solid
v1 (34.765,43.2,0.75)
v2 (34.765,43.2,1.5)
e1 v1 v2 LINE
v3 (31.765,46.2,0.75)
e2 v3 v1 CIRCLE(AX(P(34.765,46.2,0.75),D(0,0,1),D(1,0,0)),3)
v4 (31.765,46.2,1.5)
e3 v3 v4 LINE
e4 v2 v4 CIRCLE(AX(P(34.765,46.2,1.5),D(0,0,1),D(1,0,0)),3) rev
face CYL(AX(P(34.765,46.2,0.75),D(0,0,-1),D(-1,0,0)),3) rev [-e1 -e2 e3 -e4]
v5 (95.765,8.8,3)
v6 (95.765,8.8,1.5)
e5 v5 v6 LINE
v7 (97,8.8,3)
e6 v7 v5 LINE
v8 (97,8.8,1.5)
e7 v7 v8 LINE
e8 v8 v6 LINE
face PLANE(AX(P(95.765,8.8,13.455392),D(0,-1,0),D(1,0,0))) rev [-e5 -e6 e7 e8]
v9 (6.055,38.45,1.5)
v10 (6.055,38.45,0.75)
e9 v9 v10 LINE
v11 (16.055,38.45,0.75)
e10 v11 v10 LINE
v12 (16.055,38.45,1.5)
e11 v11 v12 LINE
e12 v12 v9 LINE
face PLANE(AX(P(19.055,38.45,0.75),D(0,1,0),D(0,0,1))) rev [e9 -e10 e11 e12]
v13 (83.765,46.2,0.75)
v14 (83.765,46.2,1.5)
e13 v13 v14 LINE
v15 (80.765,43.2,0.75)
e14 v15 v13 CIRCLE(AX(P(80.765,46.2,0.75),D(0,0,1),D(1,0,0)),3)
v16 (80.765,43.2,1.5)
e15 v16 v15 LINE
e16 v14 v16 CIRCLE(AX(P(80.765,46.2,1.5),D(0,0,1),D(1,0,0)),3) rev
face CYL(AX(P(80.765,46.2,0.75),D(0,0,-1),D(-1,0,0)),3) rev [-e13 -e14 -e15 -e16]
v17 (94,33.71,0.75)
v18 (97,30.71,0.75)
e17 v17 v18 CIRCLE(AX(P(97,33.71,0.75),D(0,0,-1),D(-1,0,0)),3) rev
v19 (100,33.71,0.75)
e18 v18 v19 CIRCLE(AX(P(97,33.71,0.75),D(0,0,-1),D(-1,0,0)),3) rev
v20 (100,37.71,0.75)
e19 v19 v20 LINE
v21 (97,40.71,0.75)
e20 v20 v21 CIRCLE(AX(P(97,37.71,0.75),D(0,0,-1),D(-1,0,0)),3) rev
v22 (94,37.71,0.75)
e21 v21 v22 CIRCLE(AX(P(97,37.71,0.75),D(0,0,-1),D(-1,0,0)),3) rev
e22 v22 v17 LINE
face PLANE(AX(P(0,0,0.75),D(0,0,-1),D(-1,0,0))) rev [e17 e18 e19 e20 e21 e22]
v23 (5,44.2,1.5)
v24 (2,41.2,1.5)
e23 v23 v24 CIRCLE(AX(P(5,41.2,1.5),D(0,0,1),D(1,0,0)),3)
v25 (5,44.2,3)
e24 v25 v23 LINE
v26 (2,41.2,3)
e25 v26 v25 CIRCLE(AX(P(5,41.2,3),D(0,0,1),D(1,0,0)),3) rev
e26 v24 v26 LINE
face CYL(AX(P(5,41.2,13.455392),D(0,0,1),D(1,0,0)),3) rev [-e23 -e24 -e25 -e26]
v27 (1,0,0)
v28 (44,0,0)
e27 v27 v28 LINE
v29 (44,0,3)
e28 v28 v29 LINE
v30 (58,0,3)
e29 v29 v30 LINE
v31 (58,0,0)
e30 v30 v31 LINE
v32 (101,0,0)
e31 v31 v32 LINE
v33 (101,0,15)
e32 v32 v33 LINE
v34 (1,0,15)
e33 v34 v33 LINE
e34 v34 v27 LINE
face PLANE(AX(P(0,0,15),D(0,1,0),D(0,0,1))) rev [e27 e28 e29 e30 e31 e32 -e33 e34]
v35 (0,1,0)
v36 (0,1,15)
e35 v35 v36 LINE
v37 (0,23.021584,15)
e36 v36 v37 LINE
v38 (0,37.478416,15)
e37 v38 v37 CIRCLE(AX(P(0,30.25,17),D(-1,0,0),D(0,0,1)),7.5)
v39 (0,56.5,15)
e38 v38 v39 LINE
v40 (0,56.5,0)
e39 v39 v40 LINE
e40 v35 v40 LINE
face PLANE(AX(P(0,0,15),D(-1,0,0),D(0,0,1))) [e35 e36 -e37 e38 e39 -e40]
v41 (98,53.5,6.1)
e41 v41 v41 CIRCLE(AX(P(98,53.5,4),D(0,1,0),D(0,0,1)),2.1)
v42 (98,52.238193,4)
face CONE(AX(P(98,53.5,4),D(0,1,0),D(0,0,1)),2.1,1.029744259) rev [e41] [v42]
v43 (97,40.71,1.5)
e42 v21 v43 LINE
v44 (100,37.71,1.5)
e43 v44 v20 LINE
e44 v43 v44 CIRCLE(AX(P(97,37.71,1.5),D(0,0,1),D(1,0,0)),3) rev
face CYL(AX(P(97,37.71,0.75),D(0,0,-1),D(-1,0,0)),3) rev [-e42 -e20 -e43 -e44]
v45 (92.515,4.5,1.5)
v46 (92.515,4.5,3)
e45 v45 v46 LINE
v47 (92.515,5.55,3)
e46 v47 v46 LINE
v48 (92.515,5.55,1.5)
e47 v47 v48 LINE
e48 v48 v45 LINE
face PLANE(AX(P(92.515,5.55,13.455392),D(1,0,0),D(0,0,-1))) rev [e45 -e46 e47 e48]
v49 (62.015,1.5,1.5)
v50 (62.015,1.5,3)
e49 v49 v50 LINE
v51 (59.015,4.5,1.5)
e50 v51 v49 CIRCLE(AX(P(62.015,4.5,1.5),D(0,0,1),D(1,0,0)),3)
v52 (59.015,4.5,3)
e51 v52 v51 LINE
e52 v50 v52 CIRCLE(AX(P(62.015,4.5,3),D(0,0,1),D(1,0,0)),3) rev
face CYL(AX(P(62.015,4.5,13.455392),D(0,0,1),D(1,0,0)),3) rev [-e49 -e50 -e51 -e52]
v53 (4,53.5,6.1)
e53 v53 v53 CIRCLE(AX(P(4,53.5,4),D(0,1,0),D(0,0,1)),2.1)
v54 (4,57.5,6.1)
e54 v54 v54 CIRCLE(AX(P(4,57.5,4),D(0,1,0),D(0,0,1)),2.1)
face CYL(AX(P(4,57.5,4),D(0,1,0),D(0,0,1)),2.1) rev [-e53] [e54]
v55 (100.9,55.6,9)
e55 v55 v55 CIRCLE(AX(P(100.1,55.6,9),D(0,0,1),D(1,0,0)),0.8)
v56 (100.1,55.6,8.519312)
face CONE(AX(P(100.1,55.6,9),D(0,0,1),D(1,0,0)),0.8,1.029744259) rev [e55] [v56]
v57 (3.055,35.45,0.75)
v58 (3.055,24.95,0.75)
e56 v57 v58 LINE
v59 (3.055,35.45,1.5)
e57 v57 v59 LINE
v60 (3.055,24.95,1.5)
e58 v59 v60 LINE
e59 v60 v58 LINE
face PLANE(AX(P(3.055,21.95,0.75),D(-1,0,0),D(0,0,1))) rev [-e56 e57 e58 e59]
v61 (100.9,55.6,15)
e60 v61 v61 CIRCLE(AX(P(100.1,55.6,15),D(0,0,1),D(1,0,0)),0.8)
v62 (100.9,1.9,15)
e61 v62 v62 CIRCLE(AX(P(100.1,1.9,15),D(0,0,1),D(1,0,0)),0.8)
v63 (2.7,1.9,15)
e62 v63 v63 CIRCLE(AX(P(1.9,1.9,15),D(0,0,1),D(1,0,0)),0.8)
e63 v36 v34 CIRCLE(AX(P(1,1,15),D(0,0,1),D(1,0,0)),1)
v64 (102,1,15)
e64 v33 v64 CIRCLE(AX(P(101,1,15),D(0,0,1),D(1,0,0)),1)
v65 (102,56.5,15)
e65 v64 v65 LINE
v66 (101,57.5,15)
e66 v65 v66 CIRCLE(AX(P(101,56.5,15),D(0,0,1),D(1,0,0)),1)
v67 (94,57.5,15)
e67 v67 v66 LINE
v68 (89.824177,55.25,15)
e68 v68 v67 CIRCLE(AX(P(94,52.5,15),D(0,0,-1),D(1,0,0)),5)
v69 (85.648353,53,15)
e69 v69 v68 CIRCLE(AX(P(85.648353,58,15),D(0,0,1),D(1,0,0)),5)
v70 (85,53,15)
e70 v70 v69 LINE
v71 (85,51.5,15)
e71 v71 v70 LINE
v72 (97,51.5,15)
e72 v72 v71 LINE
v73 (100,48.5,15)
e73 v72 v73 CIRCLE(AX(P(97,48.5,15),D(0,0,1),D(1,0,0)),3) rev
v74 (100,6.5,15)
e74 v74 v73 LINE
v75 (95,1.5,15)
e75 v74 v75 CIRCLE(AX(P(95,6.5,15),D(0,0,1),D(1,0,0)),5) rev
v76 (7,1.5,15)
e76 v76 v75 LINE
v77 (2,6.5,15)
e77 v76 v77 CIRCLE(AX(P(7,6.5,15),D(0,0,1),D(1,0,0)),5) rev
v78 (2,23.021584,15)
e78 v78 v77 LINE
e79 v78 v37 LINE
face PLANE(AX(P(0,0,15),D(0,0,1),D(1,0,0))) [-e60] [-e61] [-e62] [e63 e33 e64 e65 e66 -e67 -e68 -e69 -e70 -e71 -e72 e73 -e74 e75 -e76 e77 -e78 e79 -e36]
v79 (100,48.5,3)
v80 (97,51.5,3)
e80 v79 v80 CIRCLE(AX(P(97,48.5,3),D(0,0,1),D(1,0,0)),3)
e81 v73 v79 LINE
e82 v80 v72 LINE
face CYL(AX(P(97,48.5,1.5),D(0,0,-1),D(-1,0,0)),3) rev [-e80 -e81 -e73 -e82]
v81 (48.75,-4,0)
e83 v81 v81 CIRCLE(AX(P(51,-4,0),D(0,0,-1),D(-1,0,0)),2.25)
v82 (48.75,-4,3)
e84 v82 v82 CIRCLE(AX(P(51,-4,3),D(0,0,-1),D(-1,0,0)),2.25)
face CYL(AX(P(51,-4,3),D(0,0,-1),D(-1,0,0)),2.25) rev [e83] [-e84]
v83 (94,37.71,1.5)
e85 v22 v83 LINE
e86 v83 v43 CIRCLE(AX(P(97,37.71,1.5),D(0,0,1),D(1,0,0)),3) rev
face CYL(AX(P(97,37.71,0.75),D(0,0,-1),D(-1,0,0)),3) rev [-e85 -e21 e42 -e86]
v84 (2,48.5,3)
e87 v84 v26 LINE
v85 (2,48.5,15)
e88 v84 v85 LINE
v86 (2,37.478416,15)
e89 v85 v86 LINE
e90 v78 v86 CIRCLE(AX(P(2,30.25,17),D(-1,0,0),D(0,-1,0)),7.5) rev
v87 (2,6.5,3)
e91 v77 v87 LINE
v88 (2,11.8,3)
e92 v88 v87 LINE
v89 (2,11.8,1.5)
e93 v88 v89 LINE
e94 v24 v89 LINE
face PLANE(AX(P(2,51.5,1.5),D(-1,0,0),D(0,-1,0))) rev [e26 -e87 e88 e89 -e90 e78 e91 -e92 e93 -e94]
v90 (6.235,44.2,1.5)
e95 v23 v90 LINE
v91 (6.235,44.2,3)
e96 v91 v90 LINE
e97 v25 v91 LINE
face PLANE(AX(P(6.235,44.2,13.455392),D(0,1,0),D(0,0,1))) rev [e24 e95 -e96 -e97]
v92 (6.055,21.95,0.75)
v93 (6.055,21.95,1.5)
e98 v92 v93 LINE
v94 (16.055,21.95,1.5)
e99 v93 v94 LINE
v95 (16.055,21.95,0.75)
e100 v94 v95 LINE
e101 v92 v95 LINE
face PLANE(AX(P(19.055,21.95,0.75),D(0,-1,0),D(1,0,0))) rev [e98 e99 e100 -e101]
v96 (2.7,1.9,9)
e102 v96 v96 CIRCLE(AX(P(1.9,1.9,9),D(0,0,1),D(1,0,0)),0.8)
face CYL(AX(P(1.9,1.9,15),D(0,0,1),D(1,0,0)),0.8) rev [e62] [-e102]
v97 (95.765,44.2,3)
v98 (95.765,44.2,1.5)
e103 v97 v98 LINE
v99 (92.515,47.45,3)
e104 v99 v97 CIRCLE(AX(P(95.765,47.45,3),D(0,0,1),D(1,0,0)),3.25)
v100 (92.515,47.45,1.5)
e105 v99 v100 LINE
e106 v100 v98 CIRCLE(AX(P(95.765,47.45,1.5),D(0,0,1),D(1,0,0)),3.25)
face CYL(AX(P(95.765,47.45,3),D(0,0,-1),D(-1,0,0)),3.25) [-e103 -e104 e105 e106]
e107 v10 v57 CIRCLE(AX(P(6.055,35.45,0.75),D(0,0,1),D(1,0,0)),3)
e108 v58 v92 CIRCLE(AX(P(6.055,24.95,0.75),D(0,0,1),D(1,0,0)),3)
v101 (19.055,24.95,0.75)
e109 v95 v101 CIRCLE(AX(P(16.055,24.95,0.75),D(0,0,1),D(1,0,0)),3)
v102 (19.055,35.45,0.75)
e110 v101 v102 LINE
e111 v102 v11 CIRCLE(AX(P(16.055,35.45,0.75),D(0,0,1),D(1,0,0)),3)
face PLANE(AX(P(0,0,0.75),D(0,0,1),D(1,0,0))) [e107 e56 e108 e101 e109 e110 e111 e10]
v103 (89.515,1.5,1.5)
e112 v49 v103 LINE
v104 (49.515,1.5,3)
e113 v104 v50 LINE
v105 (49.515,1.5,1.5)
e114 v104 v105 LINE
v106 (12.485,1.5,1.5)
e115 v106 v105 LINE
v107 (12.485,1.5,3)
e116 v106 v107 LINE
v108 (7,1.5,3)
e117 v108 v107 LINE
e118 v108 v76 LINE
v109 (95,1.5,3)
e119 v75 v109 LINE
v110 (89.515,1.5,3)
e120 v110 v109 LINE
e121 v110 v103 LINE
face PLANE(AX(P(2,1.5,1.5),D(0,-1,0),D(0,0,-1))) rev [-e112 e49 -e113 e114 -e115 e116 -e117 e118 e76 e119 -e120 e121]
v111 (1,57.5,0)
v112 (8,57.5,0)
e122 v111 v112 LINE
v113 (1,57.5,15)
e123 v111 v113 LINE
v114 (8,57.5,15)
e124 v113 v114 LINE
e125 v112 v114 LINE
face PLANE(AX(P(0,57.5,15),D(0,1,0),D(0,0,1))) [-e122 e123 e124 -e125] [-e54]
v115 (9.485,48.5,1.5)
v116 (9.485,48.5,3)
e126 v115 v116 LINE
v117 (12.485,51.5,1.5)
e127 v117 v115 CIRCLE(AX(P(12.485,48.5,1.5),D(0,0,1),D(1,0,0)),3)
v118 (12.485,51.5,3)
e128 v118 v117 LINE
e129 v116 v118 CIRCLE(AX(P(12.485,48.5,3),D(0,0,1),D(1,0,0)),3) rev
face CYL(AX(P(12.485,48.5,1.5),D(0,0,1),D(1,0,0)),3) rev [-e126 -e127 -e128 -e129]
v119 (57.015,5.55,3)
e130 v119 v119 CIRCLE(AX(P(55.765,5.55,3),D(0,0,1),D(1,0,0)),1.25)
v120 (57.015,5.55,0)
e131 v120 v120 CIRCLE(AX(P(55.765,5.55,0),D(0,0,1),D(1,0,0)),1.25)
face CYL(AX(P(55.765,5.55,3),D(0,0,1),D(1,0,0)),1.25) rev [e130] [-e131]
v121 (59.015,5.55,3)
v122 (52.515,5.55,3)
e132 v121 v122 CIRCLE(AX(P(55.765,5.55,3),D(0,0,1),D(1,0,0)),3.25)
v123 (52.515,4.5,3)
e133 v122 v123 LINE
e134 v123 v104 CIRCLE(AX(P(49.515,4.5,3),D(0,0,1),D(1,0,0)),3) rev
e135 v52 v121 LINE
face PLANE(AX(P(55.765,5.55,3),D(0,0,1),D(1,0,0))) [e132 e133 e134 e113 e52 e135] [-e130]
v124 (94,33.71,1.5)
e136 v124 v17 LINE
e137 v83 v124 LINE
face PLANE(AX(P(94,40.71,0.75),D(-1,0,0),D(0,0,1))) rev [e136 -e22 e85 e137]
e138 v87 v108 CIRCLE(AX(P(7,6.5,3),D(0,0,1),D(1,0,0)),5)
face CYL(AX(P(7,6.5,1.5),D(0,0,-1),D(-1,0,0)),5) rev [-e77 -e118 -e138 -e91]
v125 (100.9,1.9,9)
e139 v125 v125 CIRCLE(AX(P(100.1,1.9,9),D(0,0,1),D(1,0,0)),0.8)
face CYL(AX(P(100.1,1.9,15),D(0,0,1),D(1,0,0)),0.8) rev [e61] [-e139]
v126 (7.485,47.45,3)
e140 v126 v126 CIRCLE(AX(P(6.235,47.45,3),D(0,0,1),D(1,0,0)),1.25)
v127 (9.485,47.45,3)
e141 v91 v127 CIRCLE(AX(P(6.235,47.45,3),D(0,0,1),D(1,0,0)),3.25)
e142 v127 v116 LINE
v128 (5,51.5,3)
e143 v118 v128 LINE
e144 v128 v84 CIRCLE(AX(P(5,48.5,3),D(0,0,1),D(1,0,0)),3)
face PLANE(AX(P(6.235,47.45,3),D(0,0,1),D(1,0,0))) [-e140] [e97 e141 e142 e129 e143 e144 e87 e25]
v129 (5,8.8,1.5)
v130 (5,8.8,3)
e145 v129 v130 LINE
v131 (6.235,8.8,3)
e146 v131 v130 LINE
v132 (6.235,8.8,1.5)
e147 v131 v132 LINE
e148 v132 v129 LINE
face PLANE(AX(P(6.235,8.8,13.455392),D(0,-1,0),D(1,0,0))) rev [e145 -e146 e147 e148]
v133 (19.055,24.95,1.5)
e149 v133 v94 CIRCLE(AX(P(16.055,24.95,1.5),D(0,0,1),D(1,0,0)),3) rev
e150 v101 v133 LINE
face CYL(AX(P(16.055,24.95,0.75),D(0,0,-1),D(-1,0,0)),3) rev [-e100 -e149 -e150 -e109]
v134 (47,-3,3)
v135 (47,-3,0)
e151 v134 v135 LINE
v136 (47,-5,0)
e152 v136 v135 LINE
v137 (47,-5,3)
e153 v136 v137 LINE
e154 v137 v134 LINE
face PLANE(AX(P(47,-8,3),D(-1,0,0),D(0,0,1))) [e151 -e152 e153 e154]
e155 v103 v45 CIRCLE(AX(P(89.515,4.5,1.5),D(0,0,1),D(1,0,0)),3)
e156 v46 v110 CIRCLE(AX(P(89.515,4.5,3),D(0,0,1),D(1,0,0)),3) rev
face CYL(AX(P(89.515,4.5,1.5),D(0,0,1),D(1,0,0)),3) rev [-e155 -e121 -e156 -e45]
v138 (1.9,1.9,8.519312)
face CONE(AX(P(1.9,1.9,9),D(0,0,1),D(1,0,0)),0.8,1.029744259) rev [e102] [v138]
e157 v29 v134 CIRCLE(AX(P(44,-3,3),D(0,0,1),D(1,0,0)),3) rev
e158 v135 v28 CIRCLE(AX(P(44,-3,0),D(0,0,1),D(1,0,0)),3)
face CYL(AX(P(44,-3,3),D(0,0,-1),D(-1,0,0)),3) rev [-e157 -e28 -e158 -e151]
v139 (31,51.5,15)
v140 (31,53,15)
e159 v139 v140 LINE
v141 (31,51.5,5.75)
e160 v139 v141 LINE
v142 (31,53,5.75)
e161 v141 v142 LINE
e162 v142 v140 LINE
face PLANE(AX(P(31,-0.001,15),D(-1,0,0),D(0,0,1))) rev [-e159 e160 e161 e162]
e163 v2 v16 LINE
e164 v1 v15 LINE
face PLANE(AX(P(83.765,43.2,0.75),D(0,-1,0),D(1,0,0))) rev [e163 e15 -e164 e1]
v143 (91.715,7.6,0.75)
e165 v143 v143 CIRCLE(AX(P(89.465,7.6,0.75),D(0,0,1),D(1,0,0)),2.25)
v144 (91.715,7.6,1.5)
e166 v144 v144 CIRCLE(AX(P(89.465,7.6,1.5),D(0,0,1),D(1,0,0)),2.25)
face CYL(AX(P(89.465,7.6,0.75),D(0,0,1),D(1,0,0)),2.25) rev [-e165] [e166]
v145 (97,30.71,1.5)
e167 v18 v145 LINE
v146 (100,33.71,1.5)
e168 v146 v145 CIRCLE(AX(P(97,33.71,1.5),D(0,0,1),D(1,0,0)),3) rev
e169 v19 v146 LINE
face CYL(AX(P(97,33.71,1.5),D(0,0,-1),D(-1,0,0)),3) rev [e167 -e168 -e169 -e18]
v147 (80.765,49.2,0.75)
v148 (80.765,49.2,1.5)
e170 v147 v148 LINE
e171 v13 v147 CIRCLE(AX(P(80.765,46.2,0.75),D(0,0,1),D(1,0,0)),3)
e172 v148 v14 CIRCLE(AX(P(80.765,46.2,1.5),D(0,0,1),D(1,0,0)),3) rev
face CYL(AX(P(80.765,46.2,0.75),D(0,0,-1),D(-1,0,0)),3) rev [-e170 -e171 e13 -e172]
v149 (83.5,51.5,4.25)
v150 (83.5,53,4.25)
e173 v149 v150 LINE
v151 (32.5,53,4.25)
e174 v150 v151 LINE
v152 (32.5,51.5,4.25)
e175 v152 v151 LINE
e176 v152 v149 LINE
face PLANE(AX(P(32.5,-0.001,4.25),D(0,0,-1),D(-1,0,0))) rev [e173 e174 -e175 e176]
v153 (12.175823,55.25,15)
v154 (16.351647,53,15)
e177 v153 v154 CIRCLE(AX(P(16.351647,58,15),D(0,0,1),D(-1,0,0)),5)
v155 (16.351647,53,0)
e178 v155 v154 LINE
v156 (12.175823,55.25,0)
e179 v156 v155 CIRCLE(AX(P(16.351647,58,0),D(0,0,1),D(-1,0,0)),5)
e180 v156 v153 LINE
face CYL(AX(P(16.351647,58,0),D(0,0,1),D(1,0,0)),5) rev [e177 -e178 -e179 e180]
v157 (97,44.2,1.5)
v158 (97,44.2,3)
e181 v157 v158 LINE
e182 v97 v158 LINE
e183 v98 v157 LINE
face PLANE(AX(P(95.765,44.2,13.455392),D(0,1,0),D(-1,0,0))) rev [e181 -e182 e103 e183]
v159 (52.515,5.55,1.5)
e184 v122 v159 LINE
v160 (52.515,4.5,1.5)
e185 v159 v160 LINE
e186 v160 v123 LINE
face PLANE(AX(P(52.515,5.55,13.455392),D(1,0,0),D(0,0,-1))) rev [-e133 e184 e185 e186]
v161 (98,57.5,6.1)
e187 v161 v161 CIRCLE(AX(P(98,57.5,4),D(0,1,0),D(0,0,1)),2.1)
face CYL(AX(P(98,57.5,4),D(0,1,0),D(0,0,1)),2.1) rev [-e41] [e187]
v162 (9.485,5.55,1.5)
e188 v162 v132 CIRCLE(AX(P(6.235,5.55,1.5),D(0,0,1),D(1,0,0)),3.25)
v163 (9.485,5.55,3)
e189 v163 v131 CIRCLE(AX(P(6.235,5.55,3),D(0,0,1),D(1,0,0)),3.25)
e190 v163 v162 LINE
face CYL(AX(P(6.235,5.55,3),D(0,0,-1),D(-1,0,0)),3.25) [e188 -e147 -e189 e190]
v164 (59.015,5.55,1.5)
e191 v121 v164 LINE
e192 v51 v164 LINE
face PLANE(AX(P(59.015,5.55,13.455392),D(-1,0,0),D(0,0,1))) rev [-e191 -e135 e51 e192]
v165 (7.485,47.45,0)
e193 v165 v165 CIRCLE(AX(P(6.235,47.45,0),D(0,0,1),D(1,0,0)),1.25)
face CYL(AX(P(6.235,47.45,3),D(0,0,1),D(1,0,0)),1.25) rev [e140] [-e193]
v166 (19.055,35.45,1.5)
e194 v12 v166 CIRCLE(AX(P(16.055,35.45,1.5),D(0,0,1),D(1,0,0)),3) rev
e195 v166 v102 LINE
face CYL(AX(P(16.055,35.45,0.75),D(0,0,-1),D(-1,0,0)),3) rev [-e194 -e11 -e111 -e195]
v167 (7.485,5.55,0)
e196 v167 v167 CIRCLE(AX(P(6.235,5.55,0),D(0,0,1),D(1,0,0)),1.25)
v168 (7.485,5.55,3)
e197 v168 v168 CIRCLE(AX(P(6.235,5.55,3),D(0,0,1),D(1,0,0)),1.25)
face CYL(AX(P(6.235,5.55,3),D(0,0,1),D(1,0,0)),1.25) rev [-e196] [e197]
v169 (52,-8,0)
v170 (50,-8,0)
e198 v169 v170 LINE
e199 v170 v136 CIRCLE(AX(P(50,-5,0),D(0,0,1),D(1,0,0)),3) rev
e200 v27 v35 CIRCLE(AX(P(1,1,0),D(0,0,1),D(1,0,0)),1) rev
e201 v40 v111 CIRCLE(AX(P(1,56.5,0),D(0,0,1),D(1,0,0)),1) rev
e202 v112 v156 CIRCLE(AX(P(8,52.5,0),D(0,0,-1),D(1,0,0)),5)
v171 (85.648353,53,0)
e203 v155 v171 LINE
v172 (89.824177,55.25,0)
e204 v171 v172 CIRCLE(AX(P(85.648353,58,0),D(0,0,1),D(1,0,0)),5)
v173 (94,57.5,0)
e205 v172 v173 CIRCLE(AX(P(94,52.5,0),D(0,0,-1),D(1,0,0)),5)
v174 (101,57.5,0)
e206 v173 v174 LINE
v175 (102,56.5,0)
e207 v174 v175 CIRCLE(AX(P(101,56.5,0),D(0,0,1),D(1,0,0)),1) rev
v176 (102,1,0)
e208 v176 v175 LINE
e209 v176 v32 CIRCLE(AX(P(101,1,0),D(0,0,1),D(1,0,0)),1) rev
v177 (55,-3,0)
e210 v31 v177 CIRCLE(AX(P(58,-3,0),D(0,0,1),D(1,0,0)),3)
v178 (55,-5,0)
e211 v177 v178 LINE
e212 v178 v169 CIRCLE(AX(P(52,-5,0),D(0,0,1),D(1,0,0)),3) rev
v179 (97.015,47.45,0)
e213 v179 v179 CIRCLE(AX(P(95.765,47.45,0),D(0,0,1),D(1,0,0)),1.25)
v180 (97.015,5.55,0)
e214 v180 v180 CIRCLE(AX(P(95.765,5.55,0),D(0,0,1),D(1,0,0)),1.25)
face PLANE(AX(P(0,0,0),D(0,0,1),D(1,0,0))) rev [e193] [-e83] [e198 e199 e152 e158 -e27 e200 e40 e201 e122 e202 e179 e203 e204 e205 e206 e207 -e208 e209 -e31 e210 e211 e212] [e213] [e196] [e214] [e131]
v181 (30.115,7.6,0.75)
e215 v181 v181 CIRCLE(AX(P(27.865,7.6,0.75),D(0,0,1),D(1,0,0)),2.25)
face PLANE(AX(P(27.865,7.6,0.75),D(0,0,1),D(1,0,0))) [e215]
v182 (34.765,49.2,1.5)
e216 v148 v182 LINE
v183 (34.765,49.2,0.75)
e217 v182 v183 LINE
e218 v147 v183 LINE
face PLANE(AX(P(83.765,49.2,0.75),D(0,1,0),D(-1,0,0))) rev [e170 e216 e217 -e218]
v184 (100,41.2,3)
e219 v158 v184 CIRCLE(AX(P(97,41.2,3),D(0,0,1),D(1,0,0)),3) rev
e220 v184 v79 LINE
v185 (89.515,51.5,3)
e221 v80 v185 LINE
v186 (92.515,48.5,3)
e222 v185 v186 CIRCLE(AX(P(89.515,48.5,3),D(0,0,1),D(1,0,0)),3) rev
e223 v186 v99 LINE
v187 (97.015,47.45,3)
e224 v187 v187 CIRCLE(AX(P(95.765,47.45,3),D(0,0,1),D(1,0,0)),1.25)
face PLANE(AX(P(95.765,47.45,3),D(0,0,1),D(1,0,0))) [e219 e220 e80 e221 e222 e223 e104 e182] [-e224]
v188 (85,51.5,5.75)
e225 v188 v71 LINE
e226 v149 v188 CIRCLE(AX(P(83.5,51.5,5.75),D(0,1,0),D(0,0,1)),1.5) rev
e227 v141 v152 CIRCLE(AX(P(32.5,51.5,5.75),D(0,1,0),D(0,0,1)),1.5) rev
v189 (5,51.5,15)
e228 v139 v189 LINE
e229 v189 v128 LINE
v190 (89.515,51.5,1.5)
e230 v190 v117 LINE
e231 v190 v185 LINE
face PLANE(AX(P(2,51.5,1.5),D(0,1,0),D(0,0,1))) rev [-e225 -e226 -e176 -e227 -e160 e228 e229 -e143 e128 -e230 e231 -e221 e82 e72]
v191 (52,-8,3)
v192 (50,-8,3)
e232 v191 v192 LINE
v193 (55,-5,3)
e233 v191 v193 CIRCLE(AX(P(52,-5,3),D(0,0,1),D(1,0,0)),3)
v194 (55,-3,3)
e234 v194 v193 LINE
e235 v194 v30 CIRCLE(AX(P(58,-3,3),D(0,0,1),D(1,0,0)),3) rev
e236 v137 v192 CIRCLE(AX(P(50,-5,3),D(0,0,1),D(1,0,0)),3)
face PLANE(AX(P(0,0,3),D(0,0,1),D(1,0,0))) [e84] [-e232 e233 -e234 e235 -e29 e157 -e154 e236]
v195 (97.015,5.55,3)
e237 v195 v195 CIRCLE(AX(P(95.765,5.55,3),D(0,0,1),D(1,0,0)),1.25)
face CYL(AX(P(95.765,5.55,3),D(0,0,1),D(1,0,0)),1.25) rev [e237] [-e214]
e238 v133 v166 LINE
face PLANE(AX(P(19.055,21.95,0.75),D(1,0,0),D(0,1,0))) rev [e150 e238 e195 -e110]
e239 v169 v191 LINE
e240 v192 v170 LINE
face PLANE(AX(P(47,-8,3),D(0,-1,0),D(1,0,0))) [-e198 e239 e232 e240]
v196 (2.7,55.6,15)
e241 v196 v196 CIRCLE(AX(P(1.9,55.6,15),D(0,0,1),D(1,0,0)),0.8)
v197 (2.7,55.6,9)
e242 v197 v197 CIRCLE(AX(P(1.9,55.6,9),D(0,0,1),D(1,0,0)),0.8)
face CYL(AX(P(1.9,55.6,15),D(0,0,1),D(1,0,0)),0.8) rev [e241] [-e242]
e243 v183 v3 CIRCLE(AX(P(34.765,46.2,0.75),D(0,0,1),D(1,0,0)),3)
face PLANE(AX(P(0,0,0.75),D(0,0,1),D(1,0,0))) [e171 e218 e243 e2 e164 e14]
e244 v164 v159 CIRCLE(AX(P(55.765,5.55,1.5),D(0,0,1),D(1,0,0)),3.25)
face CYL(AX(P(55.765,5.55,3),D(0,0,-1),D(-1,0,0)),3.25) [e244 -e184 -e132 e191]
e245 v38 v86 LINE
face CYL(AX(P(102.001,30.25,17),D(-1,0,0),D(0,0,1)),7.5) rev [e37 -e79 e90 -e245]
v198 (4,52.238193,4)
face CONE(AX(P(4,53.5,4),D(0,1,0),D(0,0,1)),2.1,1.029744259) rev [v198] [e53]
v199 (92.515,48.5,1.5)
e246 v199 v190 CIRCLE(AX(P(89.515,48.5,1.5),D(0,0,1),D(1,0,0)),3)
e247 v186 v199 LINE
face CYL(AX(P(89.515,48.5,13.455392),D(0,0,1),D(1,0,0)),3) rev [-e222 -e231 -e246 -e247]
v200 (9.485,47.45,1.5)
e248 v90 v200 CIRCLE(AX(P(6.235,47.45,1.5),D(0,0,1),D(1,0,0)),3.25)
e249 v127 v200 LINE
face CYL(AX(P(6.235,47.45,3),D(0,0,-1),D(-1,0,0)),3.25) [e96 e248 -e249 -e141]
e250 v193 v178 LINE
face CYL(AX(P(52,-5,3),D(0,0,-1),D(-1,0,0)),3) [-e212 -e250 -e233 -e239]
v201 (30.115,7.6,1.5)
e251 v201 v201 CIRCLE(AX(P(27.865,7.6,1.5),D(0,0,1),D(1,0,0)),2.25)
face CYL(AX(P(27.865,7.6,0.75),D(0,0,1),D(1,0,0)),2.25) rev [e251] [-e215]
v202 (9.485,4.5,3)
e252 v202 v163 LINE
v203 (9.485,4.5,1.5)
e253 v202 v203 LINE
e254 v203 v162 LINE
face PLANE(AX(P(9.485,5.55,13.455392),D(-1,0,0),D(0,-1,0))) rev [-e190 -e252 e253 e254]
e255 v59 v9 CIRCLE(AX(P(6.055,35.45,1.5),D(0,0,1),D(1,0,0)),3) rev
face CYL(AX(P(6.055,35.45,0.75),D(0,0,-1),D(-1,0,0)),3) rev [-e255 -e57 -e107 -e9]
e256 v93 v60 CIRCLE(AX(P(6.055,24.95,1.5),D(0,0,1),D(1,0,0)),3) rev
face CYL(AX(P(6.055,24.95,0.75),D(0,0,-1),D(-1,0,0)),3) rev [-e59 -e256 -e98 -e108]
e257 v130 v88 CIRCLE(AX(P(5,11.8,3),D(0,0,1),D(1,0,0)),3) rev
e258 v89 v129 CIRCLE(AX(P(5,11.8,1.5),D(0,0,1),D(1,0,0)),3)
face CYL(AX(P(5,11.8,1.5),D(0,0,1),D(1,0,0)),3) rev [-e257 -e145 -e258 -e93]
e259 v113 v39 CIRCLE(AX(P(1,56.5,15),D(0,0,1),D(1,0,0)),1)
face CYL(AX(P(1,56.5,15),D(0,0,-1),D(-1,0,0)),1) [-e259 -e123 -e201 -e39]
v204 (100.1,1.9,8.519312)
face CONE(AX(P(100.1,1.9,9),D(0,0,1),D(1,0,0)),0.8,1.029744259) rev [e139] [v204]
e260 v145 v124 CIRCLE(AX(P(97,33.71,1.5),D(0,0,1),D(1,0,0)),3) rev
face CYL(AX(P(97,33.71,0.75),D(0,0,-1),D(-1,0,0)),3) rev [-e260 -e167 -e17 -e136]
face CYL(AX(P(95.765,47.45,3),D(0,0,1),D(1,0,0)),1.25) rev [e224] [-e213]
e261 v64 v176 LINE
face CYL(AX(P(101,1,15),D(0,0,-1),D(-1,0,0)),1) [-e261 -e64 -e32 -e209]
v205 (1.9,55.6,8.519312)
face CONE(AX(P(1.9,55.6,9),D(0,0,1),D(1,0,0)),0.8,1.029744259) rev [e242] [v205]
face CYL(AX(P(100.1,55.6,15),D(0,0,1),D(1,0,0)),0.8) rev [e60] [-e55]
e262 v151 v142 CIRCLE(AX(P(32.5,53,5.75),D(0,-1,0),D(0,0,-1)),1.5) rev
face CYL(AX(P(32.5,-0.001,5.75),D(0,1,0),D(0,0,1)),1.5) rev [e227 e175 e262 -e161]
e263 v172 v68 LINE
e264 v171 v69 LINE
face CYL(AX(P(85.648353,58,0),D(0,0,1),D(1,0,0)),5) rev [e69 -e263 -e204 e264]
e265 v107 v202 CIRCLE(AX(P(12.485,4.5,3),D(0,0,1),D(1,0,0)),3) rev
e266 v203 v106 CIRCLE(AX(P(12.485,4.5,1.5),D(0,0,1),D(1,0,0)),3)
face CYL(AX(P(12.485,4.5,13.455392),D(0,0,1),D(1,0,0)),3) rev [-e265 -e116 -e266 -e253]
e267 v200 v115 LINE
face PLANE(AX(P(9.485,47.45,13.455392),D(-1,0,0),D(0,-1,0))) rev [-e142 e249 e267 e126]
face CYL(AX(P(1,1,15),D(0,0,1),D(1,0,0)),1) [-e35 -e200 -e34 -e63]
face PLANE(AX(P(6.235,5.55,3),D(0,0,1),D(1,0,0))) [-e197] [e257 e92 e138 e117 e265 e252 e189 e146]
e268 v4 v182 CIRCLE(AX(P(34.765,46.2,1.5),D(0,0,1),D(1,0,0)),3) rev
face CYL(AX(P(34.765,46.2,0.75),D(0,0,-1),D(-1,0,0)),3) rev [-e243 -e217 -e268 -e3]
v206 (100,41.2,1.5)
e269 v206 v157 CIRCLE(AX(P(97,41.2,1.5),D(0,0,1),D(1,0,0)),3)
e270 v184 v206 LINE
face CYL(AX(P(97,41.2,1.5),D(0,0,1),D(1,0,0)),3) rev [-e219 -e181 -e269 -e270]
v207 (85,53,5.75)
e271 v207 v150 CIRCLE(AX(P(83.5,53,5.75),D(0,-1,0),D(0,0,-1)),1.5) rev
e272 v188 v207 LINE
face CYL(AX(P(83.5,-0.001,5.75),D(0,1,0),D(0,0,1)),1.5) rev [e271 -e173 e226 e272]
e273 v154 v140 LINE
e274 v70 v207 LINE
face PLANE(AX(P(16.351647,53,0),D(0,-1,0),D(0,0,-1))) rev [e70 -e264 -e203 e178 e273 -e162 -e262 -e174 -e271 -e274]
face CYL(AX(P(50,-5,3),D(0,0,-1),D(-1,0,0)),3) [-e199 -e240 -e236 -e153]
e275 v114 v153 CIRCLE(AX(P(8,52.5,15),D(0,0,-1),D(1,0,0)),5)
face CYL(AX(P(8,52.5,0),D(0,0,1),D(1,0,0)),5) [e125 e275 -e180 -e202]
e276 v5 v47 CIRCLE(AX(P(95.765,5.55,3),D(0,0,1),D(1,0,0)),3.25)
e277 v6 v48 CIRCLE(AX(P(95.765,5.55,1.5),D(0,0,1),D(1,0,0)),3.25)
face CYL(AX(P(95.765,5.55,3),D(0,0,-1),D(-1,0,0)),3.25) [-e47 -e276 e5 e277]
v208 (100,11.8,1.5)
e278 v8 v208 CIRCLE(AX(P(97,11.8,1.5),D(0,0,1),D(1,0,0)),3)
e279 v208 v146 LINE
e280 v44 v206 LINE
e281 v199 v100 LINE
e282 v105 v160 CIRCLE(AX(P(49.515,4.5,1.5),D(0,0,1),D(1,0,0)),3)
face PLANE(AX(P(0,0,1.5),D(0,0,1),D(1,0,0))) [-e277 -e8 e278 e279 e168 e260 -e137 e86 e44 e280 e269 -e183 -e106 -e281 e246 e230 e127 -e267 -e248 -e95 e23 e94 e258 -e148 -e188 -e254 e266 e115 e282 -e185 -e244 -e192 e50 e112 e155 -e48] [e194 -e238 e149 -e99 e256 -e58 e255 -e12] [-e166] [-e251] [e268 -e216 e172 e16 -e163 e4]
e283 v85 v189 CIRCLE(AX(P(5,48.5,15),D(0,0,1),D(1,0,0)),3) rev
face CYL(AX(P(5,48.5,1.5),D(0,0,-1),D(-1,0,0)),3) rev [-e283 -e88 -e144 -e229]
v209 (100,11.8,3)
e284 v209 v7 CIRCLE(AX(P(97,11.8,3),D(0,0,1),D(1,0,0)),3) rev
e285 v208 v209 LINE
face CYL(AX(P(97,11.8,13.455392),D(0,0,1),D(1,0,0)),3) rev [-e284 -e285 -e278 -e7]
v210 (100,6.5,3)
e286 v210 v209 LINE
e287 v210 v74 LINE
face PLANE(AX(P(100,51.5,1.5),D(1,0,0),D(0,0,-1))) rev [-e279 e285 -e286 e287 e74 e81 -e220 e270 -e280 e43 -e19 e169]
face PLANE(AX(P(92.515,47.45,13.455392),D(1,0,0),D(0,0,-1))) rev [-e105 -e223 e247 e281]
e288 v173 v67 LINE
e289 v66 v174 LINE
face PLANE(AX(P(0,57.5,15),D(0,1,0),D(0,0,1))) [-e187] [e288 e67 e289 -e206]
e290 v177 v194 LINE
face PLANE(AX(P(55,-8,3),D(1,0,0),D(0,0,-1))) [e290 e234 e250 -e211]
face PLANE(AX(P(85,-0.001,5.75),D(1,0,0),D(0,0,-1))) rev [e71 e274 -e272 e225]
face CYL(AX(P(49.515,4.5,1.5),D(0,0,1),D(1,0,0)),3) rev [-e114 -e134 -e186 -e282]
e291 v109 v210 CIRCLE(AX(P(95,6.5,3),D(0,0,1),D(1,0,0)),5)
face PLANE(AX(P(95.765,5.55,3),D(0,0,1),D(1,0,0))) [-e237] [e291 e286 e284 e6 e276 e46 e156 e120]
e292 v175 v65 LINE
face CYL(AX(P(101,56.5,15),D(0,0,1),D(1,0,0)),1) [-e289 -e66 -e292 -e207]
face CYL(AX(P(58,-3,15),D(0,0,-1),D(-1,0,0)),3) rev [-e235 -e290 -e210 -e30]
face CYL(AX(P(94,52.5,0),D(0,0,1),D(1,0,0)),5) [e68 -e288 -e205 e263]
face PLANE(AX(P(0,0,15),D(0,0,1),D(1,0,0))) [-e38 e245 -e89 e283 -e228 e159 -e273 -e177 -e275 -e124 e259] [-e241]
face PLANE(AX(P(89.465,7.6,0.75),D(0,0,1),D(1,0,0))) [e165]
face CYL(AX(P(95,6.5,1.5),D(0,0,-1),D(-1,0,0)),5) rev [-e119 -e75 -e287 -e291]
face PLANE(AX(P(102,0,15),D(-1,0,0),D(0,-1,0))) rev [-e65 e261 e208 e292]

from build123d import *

# Parameters (mm, degrees)
SKIZZE1_W                                 = 98
SKIZZE1_H                                 = 50
SKIZZE1_W_2                               = 102
SKIZZE1_H_2                               = 57.5
AUFSATZ_LINEAR_AUSTRAGEN1_DEPTH           = 15
SKIZZE4_W                                 = 98
SKIZZE4_H                                 = 50
SCHNITT_LINEAR_AUSTRAGEN1_DEPTH           = 13.5
SKIZZE5_R                                 = 3.25
AUFSATZ_LINEAR_AUSTRAGEN2_DEPTH           = 1.5
SCHNITT_LINEAR_AUSTRAGEN3_REACH           = 120.048
SCHNITT_LINEAR_AUSTRAGEN4_REACH           = 120.048
AUFSATZ_LINEAR_AUSTRAGEN3_DEPTH           = 1.5
M3_GEWINDEBOHRUNG1_D                      = 2.5
GEWINDEBOHRUNG_F_R_M4X0_7_HELICOIL1_D     = 4.2
GEWINDEBOHRUNG_F_R_M4X0_7_HELICOIL1_DEPTH = 4
GEWINDEBOHRUNG_F_R_M4X0_7_HELICOIL1_TIP   = 1.2618073
VERRUNDUNG1_R                             = 5
VERRUNDUNG2_R                             = 3
VERRUNDUNG3_R                             = 1
VERRUNDUNG4_R                             = 3
M2_GEWINDEBOHRUNG1_D                      = 1.6
M2_GEWINDEBOHRUNG1_DEPTH                  = 6
M2_GEWINDEBOHRUNG1_TIP                    = 0.480688495
SCHNITT_LINEAR_AUSTRAGEN5_DEPTH           = 119.047659867
SKIZZE20_R                                = 2.25
AUFSATZ_LINEAR_AUSTRAGEN4_DEPTH           = 3
VERRUNDUNG5_R                             = 3
SKIZZE21_R                                = 2.25
SKIZZE21_W                                = 52
SKIZZE21_H                                = 6
SKIZZE21_W_2                              = 16
SKIZZE21_H_2                              = 16.5
SKIZZE21_W_3                              = 6
SKIZZE21_H_3                              = 10
SCHNITT_LINEAR_AUSTRAGEN6_DEPTH           = 0.75
VERRUNDUNG6_R                             = 3


with BuildPart() as part:
    # Skizze1 → Aufsatz-Linear austragen1 (new body)
    with BuildSketch(Plane.XY):
        with Locations((51, 26.5)):
            Rectangle(SKIZZE1_W, SKIZZE1_H)
        with Locations((51, 28.75)):
            Rectangle(SKIZZE1_W_2, SKIZZE1_H_2)
    extrude(amount=AUFSATZ_LINEAR_AUSTRAGEN1_DEPTH)

    # Skizze4 → Schnitt-Linear austragen1 (cut)
    with BuildSketch(Plane.XY.offset(15)):
        with Locations((51, 26.5)):
            Rectangle(SKIZZE4_W, SKIZZE4_H)
    extrude(amount=-SCHNITT_LINEAR_AUSTRAGEN1_DEPTH, mode=Mode.SUBTRACT)

    # Skizze5 → Aufsatz-Linear austragen2 (add)
    with BuildSketch(Plane.XY.offset(1.5)):
        with Locations((6.235, 5.55)):
            Circle(SKIZZE5_R)
        with Locations((55.765, 5.55)):
            Circle(SKIZZE5_R)
        with Locations((95.765, 5.55)):
            Circle(SKIZZE5_R)
        with Locations((95.765, 47.45)):
            Circle(SKIZZE5_R)
        with Locations((6.235, 47.45)):
            Circle(SKIZZE5_R)
    extrude(amount=AUFSATZ_LINEAR_AUSTRAGEN2_DEPTH)

    # Skizze11 → Schnitt-Linear austragen3 (cut, up to next)
    with BuildSketch(Plane.ZY, mode=Mode.PRIVATE) as schnitt_linear_austragen3_sk1:
        with BuildLine():
            Line((17, 37.75), (17, 22.75))
            ThreePointArc((17, 22.75), (9.5, 30.25), (17, 37.75))
        make_face()
    schnitt_linear_austragen3_tool1 = extrude(schnitt_linear_austragen3_sk1.sketch, amount=-SCHNITT_LINEAR_AUSTRAGEN3_REACH, mode=Mode.PRIVATE) & part.part
    add(schnitt_linear_austragen3_tool1.solids().sort_by_distance((0, 30.25, 13.816901))[0], mode=Mode.SUBTRACT)

    # Skizze12 → Schnitt-Linear austragen4 (cut, up to next)
    with BuildSketch(Plane(origin=(0, 57.5, 0), x_dir=(1, 0, 0), z_dir=(0, 1, 0)), mode=Mode.PRIVATE) as schnitt_linear_austragen4_sk1:
        with BuildLine():
            Line((85, -5.75), (85, -15))
            Line((85, -15), (31, -15))
            Line((31, -15), (31, -5.75))
            ThreePointArc((31, -5.75), (31.439339828, -4.689339828), (32.5, -4.25))
            Line((32.5, -4.25), (83.5, -4.25))
            ThreePointArc((83.5, -4.25), (84.560660172, -4.689339828), (85, -5.75))
        make_face()
    schnitt_linear_austragen4_tool1 = extrude(schnitt_linear_austragen4_sk1.sketch, amount=-SCHNITT_LINEAR_AUSTRAGEN4_REACH, mode=Mode.PRIVATE) & part.part
    add(schnitt_linear_austragen4_tool1.solids().sort_by_distance((58, 57.5, 9.633398))[0], mode=Mode.SUBTRACT)

    # Skizze13 → Aufsatz-Linear austragen3 (add)
    with BuildSketch(Plane.XY.offset(1.5)):
        with BuildLine():
            Line((6.235, 44.2), (2, 44.2))
            Line((2, 44.2), (2, 51.5))
            Line((2, 51.5), (9.485, 51.5))
            Line((9.485, 51.5), (9.485, 47.45))
            ThreePointArc((9.485, 47.45), (8.533097039, 45.151902961), (6.235, 44.2))
        make_face()
        with BuildLine():
            Line((9.485, 5.55), (9.485, 1.5))
            Line((9.485, 1.5), (2, 1.5))
            Line((2, 1.5), (2, 8.8))
            Line((2, 8.8), (6.235, 8.8))
            ThreePointArc((6.235, 8.8), (8.533097039, 7.848097039), (9.485, 5.55))
        make_face()
        with BuildLine():
            Line((100, 1.5), (100, 8.8))
            Line((100, 8.8), (95.765, 8.8))
            ThreePointArc((95.765, 8.8), (93.466902961, 7.848097039), (92.515, 5.55))
            Line((92.515, 5.55), (92.515, 1.5))
            Line((92.515, 1.5), (100, 1.5))
        make_face()
        with BuildLine():
            Line((100, 51.5), (92.515, 51.5))
            Line((92.515, 51.5), (92.515, 47.45))
            ThreePointArc((92.515, 47.45), (93.466902961, 45.151902961), (95.765, 44.2))
            Line((95.765, 44.2), (100, 44.2))
            Line((100, 44.2), (100, 51.5))
        make_face()
        with BuildLine():
            Line((59.015, 5.55), (59.015, 1.5))
            Line((59.015, 1.5), (52.515, 1.5))
            Line((52.515, 1.5), (52.515, 5.55))
            ThreePointArc((52.515, 5.55), (55.765, 8.8), (59.015, 5.55))
        make_face()
    extrude(amount=AUFSATZ_LINEAR_AUSTRAGEN3_DEPTH)

    # M3 Gewindebohrung1 (through all)
    with Locations(Plane.XY.offset(3)):
        with Locations((6.235, 47.45), (6.235, 5.55), (55.765, 5.55), (95.765, 47.45), (95.765, 5.55)):
            Hole(M3_GEWINDEBOHRUNG1_D / 2)

    # Gewindebohrung für M4x0.7 Helicoil1
    with Locations(Plane(origin=(38.515151917, 57.5, 4.646014508), x_dir=(-1, 0, 0), z_dir=(0, 1, 0))):
        with Locations((34.515151917, -0.646014508), (-59.484848083, -0.646014508)):
            Hole(GEWINDEBOHRUNG_F_R_M4X0_7_HELICOIL1_D / 2, depth=GEWINDEBOHRUNG_F_R_M4X0_7_HELICOIL1_DEPTH)
            with Locations((0, 0, -(GEWINDEBOHRUNG_F_R_M4X0_7_HELICOIL1_DEPTH + GEWINDEBOHRUNG_F_R_M4X0_7_HELICOIL1_TIP / 2))):  # 118° drill point
                Cone(0, GEWINDEBOHRUNG_F_R_M4X0_7_HELICOIL1_D / 2, GEWINDEBOHRUNG_F_R_M4X0_7_HELICOIL1_TIP, mode=Mode.SUBTRACT)

    # Verrundung1
    verrundung1_edges = [part.edges().sort_by_distance(p)[0] for p in [
        (2, 1.5, 9),
        (100, 1.5, 9),
    ]]
    fillet(verrundung1_edges, radius=VERRUNDUNG1_R)

    # Verrundung2
    verrundung2_edges = [part.edges().sort_by_distance(p)[0] for p in [
        (100, 44.2, 2.25),
        (92.515, 51.5, 2.25),
        (9.485, 51.5, 2.25),
        (2, 44.2, 2.25),
        (52.515, 1.5, 2.25),
        (59.015, 1.5, 2.25),
        (9.485, 1.5, 2.25),
        (2, 8.8, 2.25),
        (92.515, 1.5, 2.25),
        (100, 8.8, 2.25),
    ]]
    fillet(verrundung2_edges, radius=VERRUNDUNG2_R)

    # Verrundung3
    verrundung3_edges = [part.edges().sort_by_distance(p)[0] for p in [
        (0, 0, 7.5),
        (0, 57.5, 7.5),
        (102, 57.5, 7.5),
        (102, 0, 7.5),
    ]]
    fillet(verrundung3_edges, radius=VERRUNDUNG3_R)

    # Verrundung4
    verrundung4_edges = [part.edges().sort_by_distance(p)[0] for p in [
        (100, 51.5, 9),
        (2, 51.5, 9),
    ]]
    fillet(verrundung4_edges, radius=VERRUNDUNG4_R)

    # M2 Gewindebohrung1
    with Locations(Plane.XY.offset(15)):
        with Locations((1.9, 55.6), (100.1, 55.6), (100.1, 1.9), (1.9, 1.9)):
            Hole(M2_GEWINDEBOHRUNG1_D / 2, depth=M2_GEWINDEBOHRUNG1_DEPTH)
            with Locations((0, 0, -(M2_GEWINDEBOHRUNG1_DEPTH + M2_GEWINDEBOHRUNG1_TIP / 2))):  # 118° drill point
                Cone(0, M2_GEWINDEBOHRUNG1_D / 2, M2_GEWINDEBOHRUNG1_TIP, mode=Mode.SUBTRACT)

    # Skizze19 → Schnitt-Linear austragen5 (cut, through all)
    with BuildSketch(Plane.XY.offset(15)):
        with BuildLine():
            Line((94, 57.5), (8, 57.5))
            ThreePointArc((8, 57.5), (10.371708245, 56.901704215), (12.175823272, 55.25))
            ThreePointArc((12.175823272, 55.25), (13.979938299, 53.598295785), (16.351646544, 53))
            Line((16.351646544, 53), (85.648353456, 53))
            ThreePointArc((85.648353456, 53), (88.020061701, 53.598295785), (89.824176728, 55.25))
            ThreePointArc((89.824176728, 55.25), (91.628291755, 56.901704215), (94, 57.5))
        make_face()
    extrude(amount=-SCHNITT_LINEAR_AUSTRAGEN5_DEPTH, mode=Mode.SUBTRACT)

    # Skizze20 → Aufsatz-Linear austragen4 (add)
    with BuildSketch(Plane(origin=(0, 0, 0), x_dir=(-1, 0, 0), z_dir=(0, 0, -1))):
        Polygon((-47, -8), (-51, -8), (-55, -8), (-55, 0), (-47, 0), align=None)
        with Locations((-51, -4)):
            Circle(SKIZZE20_R, mode=Mode.SUBTRACT)
    extrude(amount=-AUFSATZ_LINEAR_AUSTRAGEN4_DEPTH)

    # Verrundung5
    verrundung5_edges = [part.edges().sort_by_distance(p)[0] for p in [
        (55, -8, 1.5),
        (55, 0, 1.5),
        (47, 0, 1.5),
        (47, -8, 1.5),
    ]]
    fillet(verrundung5_edges, radius=VERRUNDUNG5_R)

    # Skizze21 → Schnitt-Linear austragen6 (cut)
    with BuildSketch(Plane.XY.offset(1.5)):
        with Locations((89.465, 7.6)):
            Circle(SKIZZE21_R)
        with Locations((27.865, 7.6)):
            Circle(SKIZZE21_R)
        with Locations((57.765, 46.2)):
            Rectangle(SKIZZE21_W, SKIZZE21_H)
        with Locations((11.055, 30.2)):
            Rectangle(SKIZZE21_W_2, SKIZZE21_H_2)
        with Locations((97, 35.71)):
            Rectangle(SKIZZE21_W_3, SKIZZE21_H_3)
    extrude(amount=-SCHNITT_LINEAR_AUSTRAGEN6_DEPTH, mode=Mode.SUBTRACT)

    # Verrundung6
    verrundung6_edges = [part.edges().sort_by_distance(p)[0] for p in [
        (3.055, 21.95, 1.125),
        (3.055, 38.45, 1.125),
        (19.055, 38.45, 1.125),
        (19.055, 21.95, 1.125),
        (31.765, 43.2, 1.125),
        (31.765, 49.2, 1.125),
        (83.765, 49.2, 1.125),
        (83.765, 43.2, 1.125),
        (100, 30.71, 1.125),
        (94, 30.71, 1.125),
        (94, 40.71, 1.125),
        (100, 40.71, 1.125),
    ]]
    fillet(verrundung6_edges, radius=VERRUNDUNG6_R - 0.0001)  # a hair under: the kernel refuses the full size


solid = part.part
